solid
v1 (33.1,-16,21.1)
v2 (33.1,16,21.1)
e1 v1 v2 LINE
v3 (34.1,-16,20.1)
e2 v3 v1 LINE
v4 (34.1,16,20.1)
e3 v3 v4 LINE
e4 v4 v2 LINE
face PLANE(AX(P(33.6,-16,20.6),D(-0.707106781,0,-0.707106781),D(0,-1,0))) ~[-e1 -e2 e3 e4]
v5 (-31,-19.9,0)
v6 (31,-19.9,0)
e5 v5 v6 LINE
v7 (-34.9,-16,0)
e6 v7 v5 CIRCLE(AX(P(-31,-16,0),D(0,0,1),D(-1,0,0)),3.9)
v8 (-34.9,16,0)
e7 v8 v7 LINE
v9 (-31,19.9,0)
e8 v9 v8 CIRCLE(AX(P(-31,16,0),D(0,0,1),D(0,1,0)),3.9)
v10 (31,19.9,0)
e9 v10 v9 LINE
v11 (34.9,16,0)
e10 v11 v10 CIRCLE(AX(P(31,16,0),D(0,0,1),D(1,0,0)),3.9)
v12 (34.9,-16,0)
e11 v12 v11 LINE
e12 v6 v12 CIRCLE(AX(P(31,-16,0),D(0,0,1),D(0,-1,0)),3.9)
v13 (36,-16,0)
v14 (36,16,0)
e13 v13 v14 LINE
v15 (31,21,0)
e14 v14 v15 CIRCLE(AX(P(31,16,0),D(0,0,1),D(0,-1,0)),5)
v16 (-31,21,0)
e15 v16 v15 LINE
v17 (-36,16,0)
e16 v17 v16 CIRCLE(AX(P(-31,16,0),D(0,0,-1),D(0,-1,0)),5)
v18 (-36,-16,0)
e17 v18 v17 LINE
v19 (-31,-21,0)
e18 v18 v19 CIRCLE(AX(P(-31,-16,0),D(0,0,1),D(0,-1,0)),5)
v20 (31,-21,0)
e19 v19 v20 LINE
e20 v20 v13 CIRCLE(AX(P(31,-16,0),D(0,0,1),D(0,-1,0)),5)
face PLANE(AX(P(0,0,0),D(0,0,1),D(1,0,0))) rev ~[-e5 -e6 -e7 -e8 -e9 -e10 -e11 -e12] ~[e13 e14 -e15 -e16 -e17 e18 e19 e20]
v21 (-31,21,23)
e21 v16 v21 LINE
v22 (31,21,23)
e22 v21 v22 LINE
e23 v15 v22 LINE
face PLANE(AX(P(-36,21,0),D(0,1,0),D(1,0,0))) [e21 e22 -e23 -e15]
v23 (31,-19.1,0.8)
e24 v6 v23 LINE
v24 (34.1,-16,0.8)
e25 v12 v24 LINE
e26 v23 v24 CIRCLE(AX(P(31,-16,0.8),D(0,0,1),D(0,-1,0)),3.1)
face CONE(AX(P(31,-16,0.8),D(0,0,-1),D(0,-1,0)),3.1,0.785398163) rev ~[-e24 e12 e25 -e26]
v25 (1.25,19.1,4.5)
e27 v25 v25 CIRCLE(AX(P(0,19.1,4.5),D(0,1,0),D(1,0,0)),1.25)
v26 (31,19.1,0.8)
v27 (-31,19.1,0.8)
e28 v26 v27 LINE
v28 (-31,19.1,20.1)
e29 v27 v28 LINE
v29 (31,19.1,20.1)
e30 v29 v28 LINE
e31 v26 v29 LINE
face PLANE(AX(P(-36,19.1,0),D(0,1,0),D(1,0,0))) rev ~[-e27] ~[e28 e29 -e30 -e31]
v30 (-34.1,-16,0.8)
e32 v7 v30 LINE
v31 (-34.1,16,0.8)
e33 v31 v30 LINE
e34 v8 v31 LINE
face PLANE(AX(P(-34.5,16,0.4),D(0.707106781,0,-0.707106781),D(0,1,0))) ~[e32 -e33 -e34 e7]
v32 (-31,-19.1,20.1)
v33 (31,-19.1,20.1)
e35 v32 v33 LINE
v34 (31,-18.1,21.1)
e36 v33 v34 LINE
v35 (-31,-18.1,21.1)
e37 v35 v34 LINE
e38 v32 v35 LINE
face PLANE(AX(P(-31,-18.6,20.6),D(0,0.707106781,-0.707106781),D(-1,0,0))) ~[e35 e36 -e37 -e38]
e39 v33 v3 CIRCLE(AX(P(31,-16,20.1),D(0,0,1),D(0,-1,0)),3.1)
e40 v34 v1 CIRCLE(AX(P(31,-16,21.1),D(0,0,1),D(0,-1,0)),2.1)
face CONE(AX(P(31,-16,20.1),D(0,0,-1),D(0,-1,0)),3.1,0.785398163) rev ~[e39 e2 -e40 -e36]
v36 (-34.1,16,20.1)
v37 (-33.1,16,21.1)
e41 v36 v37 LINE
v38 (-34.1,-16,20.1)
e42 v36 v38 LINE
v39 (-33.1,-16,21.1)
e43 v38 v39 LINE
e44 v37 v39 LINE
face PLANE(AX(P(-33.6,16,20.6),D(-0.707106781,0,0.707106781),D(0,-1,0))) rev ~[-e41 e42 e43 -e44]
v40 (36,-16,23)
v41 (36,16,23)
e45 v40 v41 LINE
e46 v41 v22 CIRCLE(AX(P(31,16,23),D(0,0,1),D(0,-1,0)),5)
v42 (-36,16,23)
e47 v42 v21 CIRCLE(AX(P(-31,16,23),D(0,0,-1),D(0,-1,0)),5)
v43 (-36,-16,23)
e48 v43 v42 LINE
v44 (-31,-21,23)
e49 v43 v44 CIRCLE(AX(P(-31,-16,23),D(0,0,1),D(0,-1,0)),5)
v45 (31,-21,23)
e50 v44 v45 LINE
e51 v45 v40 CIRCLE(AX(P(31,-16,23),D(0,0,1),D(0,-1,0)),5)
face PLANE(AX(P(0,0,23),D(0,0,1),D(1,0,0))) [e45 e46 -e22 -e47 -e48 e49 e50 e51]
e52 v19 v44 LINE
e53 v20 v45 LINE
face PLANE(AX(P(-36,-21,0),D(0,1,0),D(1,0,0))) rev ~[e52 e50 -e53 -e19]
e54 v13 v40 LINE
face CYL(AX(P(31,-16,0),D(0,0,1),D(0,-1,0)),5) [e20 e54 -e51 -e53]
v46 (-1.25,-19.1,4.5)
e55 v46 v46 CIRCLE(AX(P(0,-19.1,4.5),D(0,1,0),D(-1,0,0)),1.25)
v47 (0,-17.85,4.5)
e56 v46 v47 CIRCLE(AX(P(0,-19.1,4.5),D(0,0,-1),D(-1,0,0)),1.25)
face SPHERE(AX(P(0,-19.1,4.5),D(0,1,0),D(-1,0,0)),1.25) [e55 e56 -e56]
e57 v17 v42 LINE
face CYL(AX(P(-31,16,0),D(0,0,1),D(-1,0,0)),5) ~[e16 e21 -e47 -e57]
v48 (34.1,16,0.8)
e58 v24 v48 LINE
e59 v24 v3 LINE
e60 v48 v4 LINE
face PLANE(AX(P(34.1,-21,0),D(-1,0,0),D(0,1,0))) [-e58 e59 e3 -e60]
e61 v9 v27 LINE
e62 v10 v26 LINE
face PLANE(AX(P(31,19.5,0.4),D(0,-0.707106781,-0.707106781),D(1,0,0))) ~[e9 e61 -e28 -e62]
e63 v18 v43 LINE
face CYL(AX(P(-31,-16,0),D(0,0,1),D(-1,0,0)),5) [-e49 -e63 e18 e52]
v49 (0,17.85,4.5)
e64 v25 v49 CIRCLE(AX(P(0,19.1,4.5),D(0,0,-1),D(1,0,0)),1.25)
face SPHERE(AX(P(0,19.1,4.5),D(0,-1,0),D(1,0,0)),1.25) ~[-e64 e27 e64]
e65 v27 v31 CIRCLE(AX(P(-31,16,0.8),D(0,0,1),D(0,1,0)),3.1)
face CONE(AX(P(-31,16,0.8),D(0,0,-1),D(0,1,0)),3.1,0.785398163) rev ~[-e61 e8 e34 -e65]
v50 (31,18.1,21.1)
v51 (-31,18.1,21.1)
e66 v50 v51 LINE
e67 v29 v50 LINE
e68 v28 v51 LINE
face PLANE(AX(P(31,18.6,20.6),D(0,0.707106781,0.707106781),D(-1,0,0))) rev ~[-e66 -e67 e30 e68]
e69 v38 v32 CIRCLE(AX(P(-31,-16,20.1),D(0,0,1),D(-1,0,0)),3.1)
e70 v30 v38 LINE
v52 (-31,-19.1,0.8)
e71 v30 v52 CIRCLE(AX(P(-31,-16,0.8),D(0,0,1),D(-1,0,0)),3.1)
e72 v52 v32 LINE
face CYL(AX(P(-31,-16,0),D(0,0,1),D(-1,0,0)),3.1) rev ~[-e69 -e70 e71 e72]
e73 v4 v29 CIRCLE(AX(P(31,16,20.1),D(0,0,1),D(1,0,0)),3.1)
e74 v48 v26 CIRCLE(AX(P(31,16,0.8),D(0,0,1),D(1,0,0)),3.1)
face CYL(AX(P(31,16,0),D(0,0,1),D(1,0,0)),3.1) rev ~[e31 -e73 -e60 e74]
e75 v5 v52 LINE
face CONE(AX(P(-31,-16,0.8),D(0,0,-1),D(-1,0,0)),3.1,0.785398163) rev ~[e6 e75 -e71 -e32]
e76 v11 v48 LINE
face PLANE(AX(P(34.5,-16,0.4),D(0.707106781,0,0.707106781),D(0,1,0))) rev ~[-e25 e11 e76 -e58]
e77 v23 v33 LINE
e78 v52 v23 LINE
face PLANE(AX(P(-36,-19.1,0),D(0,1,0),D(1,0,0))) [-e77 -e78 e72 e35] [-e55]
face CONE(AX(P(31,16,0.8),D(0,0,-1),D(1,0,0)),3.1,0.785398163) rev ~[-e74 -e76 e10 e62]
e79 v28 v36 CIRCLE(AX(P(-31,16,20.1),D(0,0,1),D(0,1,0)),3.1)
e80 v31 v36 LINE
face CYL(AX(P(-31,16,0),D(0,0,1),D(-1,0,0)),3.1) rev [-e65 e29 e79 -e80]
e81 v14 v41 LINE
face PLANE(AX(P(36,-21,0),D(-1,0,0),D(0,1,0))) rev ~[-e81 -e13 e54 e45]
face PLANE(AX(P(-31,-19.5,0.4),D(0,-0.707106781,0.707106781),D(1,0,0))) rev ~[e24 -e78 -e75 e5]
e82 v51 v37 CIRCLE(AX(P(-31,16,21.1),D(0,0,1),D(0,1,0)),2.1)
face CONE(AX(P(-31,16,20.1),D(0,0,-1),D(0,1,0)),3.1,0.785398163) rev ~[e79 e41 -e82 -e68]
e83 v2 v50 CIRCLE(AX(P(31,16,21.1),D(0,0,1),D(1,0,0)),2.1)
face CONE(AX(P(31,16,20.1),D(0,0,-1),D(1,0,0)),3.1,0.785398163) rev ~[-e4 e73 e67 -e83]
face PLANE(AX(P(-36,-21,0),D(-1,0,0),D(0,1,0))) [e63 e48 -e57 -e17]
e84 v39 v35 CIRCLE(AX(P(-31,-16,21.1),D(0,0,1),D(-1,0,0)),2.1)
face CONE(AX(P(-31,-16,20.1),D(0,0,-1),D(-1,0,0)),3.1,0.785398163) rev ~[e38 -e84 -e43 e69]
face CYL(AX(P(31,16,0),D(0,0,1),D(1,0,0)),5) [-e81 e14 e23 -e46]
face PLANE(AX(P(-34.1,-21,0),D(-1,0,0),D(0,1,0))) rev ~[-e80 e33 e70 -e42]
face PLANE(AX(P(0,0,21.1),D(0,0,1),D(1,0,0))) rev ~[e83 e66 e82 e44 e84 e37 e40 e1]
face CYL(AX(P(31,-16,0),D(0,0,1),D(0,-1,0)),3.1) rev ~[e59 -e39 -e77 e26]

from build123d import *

# Parameters (mm, degrees)
F0_W     = 72
F0_H     = 42
F1_DEPTH = 23
F2_R     = 5
F3_T     = -1.9
F4_SIZE  = 0.8
F5_SIZE  = 1


with BuildPart() as f1:
    # F0 (on Top) → F1 (new body)
    with BuildSketch(Plane.XY):
        Rectangle(F0_W, F0_H)
    extrude(amount=F1_DEPTH)

    # F2
    f2_edges = [f1.edges().sort_by_distance(p)[0] for p in [
        (-36, -21, 11.5),
        (36, -21, 11.5),
        (36, 21, 11.5),
        (-36, 21, 11.5),
    ]]
    fillet(f2_edges, radius=F2_R)

    # F3
    f3_openings = [f1.faces().sort_by_distance(p)[0] for p in [
        (0, 0, 0),
    ]]
    offset(amount=F3_T, openings=f3_openings)

    # F4
    f4_edges = [f1.edges().sort_by_distance(p)[0] for p in [
        (34.1, 0, 0),
        (33.192031, -18.192031, 0),
        (0, -19.1, 0),
        (-33.192031, -18.192031, 0),
        (-34.1, 0, 0),
        (-33.192031, 18.192031, 0),
        (0, 19.1, 0),
        (33.192031, 18.192031, 0),
    ]]
    chamfer(f4_edges, length=F4_SIZE)

    # F5
    f5_edges = [f1.edges().sort_by_distance(p)[0] for p in [
        (34.1, 0, 21.1),
        (33.192031, 18.192031, 21.1),
        (0, 19.1, 21.1),
        (-33.192031, 18.192031, 21.1),
        (-34.1, 0, 21.1),
        (-33.192031, -18.192031, 21.1),
        (0, -19.1, 21.1),
        (33.192031, -18.192031, 21.1),
    ]]
    chamfer(f5_edges, length=F5_SIZE)

    # F7 (on offset) → F8 (revolve)
    with BuildSketch(Plane(origin=(0, 0, 4.5), x_dir=(1, 0, 0), z_dir=(0, 0, -1))):
        with BuildLine():
            Line((0, -19.1), (1.25, -19.1))
            ThreePointArc((1.25, -19.1), (0.8838834765, -18.2161165235), (0, -17.85))
            Line((0, -17.85), (0, -19.1))
        make_face()
        with BuildLine():
            Line((0, 19.1), (-1.25, 19.1))
            ThreePointArc((-1.25, 19.1), (-0.8838834765, 18.2161165235), (0, 17.85))
            Line((0, 17.85), (0, 19.1))
        make_face()
    revolve(axis=Axis((0, 18.475, 4.5), (0, 1, 0)))


solid = f1.part
